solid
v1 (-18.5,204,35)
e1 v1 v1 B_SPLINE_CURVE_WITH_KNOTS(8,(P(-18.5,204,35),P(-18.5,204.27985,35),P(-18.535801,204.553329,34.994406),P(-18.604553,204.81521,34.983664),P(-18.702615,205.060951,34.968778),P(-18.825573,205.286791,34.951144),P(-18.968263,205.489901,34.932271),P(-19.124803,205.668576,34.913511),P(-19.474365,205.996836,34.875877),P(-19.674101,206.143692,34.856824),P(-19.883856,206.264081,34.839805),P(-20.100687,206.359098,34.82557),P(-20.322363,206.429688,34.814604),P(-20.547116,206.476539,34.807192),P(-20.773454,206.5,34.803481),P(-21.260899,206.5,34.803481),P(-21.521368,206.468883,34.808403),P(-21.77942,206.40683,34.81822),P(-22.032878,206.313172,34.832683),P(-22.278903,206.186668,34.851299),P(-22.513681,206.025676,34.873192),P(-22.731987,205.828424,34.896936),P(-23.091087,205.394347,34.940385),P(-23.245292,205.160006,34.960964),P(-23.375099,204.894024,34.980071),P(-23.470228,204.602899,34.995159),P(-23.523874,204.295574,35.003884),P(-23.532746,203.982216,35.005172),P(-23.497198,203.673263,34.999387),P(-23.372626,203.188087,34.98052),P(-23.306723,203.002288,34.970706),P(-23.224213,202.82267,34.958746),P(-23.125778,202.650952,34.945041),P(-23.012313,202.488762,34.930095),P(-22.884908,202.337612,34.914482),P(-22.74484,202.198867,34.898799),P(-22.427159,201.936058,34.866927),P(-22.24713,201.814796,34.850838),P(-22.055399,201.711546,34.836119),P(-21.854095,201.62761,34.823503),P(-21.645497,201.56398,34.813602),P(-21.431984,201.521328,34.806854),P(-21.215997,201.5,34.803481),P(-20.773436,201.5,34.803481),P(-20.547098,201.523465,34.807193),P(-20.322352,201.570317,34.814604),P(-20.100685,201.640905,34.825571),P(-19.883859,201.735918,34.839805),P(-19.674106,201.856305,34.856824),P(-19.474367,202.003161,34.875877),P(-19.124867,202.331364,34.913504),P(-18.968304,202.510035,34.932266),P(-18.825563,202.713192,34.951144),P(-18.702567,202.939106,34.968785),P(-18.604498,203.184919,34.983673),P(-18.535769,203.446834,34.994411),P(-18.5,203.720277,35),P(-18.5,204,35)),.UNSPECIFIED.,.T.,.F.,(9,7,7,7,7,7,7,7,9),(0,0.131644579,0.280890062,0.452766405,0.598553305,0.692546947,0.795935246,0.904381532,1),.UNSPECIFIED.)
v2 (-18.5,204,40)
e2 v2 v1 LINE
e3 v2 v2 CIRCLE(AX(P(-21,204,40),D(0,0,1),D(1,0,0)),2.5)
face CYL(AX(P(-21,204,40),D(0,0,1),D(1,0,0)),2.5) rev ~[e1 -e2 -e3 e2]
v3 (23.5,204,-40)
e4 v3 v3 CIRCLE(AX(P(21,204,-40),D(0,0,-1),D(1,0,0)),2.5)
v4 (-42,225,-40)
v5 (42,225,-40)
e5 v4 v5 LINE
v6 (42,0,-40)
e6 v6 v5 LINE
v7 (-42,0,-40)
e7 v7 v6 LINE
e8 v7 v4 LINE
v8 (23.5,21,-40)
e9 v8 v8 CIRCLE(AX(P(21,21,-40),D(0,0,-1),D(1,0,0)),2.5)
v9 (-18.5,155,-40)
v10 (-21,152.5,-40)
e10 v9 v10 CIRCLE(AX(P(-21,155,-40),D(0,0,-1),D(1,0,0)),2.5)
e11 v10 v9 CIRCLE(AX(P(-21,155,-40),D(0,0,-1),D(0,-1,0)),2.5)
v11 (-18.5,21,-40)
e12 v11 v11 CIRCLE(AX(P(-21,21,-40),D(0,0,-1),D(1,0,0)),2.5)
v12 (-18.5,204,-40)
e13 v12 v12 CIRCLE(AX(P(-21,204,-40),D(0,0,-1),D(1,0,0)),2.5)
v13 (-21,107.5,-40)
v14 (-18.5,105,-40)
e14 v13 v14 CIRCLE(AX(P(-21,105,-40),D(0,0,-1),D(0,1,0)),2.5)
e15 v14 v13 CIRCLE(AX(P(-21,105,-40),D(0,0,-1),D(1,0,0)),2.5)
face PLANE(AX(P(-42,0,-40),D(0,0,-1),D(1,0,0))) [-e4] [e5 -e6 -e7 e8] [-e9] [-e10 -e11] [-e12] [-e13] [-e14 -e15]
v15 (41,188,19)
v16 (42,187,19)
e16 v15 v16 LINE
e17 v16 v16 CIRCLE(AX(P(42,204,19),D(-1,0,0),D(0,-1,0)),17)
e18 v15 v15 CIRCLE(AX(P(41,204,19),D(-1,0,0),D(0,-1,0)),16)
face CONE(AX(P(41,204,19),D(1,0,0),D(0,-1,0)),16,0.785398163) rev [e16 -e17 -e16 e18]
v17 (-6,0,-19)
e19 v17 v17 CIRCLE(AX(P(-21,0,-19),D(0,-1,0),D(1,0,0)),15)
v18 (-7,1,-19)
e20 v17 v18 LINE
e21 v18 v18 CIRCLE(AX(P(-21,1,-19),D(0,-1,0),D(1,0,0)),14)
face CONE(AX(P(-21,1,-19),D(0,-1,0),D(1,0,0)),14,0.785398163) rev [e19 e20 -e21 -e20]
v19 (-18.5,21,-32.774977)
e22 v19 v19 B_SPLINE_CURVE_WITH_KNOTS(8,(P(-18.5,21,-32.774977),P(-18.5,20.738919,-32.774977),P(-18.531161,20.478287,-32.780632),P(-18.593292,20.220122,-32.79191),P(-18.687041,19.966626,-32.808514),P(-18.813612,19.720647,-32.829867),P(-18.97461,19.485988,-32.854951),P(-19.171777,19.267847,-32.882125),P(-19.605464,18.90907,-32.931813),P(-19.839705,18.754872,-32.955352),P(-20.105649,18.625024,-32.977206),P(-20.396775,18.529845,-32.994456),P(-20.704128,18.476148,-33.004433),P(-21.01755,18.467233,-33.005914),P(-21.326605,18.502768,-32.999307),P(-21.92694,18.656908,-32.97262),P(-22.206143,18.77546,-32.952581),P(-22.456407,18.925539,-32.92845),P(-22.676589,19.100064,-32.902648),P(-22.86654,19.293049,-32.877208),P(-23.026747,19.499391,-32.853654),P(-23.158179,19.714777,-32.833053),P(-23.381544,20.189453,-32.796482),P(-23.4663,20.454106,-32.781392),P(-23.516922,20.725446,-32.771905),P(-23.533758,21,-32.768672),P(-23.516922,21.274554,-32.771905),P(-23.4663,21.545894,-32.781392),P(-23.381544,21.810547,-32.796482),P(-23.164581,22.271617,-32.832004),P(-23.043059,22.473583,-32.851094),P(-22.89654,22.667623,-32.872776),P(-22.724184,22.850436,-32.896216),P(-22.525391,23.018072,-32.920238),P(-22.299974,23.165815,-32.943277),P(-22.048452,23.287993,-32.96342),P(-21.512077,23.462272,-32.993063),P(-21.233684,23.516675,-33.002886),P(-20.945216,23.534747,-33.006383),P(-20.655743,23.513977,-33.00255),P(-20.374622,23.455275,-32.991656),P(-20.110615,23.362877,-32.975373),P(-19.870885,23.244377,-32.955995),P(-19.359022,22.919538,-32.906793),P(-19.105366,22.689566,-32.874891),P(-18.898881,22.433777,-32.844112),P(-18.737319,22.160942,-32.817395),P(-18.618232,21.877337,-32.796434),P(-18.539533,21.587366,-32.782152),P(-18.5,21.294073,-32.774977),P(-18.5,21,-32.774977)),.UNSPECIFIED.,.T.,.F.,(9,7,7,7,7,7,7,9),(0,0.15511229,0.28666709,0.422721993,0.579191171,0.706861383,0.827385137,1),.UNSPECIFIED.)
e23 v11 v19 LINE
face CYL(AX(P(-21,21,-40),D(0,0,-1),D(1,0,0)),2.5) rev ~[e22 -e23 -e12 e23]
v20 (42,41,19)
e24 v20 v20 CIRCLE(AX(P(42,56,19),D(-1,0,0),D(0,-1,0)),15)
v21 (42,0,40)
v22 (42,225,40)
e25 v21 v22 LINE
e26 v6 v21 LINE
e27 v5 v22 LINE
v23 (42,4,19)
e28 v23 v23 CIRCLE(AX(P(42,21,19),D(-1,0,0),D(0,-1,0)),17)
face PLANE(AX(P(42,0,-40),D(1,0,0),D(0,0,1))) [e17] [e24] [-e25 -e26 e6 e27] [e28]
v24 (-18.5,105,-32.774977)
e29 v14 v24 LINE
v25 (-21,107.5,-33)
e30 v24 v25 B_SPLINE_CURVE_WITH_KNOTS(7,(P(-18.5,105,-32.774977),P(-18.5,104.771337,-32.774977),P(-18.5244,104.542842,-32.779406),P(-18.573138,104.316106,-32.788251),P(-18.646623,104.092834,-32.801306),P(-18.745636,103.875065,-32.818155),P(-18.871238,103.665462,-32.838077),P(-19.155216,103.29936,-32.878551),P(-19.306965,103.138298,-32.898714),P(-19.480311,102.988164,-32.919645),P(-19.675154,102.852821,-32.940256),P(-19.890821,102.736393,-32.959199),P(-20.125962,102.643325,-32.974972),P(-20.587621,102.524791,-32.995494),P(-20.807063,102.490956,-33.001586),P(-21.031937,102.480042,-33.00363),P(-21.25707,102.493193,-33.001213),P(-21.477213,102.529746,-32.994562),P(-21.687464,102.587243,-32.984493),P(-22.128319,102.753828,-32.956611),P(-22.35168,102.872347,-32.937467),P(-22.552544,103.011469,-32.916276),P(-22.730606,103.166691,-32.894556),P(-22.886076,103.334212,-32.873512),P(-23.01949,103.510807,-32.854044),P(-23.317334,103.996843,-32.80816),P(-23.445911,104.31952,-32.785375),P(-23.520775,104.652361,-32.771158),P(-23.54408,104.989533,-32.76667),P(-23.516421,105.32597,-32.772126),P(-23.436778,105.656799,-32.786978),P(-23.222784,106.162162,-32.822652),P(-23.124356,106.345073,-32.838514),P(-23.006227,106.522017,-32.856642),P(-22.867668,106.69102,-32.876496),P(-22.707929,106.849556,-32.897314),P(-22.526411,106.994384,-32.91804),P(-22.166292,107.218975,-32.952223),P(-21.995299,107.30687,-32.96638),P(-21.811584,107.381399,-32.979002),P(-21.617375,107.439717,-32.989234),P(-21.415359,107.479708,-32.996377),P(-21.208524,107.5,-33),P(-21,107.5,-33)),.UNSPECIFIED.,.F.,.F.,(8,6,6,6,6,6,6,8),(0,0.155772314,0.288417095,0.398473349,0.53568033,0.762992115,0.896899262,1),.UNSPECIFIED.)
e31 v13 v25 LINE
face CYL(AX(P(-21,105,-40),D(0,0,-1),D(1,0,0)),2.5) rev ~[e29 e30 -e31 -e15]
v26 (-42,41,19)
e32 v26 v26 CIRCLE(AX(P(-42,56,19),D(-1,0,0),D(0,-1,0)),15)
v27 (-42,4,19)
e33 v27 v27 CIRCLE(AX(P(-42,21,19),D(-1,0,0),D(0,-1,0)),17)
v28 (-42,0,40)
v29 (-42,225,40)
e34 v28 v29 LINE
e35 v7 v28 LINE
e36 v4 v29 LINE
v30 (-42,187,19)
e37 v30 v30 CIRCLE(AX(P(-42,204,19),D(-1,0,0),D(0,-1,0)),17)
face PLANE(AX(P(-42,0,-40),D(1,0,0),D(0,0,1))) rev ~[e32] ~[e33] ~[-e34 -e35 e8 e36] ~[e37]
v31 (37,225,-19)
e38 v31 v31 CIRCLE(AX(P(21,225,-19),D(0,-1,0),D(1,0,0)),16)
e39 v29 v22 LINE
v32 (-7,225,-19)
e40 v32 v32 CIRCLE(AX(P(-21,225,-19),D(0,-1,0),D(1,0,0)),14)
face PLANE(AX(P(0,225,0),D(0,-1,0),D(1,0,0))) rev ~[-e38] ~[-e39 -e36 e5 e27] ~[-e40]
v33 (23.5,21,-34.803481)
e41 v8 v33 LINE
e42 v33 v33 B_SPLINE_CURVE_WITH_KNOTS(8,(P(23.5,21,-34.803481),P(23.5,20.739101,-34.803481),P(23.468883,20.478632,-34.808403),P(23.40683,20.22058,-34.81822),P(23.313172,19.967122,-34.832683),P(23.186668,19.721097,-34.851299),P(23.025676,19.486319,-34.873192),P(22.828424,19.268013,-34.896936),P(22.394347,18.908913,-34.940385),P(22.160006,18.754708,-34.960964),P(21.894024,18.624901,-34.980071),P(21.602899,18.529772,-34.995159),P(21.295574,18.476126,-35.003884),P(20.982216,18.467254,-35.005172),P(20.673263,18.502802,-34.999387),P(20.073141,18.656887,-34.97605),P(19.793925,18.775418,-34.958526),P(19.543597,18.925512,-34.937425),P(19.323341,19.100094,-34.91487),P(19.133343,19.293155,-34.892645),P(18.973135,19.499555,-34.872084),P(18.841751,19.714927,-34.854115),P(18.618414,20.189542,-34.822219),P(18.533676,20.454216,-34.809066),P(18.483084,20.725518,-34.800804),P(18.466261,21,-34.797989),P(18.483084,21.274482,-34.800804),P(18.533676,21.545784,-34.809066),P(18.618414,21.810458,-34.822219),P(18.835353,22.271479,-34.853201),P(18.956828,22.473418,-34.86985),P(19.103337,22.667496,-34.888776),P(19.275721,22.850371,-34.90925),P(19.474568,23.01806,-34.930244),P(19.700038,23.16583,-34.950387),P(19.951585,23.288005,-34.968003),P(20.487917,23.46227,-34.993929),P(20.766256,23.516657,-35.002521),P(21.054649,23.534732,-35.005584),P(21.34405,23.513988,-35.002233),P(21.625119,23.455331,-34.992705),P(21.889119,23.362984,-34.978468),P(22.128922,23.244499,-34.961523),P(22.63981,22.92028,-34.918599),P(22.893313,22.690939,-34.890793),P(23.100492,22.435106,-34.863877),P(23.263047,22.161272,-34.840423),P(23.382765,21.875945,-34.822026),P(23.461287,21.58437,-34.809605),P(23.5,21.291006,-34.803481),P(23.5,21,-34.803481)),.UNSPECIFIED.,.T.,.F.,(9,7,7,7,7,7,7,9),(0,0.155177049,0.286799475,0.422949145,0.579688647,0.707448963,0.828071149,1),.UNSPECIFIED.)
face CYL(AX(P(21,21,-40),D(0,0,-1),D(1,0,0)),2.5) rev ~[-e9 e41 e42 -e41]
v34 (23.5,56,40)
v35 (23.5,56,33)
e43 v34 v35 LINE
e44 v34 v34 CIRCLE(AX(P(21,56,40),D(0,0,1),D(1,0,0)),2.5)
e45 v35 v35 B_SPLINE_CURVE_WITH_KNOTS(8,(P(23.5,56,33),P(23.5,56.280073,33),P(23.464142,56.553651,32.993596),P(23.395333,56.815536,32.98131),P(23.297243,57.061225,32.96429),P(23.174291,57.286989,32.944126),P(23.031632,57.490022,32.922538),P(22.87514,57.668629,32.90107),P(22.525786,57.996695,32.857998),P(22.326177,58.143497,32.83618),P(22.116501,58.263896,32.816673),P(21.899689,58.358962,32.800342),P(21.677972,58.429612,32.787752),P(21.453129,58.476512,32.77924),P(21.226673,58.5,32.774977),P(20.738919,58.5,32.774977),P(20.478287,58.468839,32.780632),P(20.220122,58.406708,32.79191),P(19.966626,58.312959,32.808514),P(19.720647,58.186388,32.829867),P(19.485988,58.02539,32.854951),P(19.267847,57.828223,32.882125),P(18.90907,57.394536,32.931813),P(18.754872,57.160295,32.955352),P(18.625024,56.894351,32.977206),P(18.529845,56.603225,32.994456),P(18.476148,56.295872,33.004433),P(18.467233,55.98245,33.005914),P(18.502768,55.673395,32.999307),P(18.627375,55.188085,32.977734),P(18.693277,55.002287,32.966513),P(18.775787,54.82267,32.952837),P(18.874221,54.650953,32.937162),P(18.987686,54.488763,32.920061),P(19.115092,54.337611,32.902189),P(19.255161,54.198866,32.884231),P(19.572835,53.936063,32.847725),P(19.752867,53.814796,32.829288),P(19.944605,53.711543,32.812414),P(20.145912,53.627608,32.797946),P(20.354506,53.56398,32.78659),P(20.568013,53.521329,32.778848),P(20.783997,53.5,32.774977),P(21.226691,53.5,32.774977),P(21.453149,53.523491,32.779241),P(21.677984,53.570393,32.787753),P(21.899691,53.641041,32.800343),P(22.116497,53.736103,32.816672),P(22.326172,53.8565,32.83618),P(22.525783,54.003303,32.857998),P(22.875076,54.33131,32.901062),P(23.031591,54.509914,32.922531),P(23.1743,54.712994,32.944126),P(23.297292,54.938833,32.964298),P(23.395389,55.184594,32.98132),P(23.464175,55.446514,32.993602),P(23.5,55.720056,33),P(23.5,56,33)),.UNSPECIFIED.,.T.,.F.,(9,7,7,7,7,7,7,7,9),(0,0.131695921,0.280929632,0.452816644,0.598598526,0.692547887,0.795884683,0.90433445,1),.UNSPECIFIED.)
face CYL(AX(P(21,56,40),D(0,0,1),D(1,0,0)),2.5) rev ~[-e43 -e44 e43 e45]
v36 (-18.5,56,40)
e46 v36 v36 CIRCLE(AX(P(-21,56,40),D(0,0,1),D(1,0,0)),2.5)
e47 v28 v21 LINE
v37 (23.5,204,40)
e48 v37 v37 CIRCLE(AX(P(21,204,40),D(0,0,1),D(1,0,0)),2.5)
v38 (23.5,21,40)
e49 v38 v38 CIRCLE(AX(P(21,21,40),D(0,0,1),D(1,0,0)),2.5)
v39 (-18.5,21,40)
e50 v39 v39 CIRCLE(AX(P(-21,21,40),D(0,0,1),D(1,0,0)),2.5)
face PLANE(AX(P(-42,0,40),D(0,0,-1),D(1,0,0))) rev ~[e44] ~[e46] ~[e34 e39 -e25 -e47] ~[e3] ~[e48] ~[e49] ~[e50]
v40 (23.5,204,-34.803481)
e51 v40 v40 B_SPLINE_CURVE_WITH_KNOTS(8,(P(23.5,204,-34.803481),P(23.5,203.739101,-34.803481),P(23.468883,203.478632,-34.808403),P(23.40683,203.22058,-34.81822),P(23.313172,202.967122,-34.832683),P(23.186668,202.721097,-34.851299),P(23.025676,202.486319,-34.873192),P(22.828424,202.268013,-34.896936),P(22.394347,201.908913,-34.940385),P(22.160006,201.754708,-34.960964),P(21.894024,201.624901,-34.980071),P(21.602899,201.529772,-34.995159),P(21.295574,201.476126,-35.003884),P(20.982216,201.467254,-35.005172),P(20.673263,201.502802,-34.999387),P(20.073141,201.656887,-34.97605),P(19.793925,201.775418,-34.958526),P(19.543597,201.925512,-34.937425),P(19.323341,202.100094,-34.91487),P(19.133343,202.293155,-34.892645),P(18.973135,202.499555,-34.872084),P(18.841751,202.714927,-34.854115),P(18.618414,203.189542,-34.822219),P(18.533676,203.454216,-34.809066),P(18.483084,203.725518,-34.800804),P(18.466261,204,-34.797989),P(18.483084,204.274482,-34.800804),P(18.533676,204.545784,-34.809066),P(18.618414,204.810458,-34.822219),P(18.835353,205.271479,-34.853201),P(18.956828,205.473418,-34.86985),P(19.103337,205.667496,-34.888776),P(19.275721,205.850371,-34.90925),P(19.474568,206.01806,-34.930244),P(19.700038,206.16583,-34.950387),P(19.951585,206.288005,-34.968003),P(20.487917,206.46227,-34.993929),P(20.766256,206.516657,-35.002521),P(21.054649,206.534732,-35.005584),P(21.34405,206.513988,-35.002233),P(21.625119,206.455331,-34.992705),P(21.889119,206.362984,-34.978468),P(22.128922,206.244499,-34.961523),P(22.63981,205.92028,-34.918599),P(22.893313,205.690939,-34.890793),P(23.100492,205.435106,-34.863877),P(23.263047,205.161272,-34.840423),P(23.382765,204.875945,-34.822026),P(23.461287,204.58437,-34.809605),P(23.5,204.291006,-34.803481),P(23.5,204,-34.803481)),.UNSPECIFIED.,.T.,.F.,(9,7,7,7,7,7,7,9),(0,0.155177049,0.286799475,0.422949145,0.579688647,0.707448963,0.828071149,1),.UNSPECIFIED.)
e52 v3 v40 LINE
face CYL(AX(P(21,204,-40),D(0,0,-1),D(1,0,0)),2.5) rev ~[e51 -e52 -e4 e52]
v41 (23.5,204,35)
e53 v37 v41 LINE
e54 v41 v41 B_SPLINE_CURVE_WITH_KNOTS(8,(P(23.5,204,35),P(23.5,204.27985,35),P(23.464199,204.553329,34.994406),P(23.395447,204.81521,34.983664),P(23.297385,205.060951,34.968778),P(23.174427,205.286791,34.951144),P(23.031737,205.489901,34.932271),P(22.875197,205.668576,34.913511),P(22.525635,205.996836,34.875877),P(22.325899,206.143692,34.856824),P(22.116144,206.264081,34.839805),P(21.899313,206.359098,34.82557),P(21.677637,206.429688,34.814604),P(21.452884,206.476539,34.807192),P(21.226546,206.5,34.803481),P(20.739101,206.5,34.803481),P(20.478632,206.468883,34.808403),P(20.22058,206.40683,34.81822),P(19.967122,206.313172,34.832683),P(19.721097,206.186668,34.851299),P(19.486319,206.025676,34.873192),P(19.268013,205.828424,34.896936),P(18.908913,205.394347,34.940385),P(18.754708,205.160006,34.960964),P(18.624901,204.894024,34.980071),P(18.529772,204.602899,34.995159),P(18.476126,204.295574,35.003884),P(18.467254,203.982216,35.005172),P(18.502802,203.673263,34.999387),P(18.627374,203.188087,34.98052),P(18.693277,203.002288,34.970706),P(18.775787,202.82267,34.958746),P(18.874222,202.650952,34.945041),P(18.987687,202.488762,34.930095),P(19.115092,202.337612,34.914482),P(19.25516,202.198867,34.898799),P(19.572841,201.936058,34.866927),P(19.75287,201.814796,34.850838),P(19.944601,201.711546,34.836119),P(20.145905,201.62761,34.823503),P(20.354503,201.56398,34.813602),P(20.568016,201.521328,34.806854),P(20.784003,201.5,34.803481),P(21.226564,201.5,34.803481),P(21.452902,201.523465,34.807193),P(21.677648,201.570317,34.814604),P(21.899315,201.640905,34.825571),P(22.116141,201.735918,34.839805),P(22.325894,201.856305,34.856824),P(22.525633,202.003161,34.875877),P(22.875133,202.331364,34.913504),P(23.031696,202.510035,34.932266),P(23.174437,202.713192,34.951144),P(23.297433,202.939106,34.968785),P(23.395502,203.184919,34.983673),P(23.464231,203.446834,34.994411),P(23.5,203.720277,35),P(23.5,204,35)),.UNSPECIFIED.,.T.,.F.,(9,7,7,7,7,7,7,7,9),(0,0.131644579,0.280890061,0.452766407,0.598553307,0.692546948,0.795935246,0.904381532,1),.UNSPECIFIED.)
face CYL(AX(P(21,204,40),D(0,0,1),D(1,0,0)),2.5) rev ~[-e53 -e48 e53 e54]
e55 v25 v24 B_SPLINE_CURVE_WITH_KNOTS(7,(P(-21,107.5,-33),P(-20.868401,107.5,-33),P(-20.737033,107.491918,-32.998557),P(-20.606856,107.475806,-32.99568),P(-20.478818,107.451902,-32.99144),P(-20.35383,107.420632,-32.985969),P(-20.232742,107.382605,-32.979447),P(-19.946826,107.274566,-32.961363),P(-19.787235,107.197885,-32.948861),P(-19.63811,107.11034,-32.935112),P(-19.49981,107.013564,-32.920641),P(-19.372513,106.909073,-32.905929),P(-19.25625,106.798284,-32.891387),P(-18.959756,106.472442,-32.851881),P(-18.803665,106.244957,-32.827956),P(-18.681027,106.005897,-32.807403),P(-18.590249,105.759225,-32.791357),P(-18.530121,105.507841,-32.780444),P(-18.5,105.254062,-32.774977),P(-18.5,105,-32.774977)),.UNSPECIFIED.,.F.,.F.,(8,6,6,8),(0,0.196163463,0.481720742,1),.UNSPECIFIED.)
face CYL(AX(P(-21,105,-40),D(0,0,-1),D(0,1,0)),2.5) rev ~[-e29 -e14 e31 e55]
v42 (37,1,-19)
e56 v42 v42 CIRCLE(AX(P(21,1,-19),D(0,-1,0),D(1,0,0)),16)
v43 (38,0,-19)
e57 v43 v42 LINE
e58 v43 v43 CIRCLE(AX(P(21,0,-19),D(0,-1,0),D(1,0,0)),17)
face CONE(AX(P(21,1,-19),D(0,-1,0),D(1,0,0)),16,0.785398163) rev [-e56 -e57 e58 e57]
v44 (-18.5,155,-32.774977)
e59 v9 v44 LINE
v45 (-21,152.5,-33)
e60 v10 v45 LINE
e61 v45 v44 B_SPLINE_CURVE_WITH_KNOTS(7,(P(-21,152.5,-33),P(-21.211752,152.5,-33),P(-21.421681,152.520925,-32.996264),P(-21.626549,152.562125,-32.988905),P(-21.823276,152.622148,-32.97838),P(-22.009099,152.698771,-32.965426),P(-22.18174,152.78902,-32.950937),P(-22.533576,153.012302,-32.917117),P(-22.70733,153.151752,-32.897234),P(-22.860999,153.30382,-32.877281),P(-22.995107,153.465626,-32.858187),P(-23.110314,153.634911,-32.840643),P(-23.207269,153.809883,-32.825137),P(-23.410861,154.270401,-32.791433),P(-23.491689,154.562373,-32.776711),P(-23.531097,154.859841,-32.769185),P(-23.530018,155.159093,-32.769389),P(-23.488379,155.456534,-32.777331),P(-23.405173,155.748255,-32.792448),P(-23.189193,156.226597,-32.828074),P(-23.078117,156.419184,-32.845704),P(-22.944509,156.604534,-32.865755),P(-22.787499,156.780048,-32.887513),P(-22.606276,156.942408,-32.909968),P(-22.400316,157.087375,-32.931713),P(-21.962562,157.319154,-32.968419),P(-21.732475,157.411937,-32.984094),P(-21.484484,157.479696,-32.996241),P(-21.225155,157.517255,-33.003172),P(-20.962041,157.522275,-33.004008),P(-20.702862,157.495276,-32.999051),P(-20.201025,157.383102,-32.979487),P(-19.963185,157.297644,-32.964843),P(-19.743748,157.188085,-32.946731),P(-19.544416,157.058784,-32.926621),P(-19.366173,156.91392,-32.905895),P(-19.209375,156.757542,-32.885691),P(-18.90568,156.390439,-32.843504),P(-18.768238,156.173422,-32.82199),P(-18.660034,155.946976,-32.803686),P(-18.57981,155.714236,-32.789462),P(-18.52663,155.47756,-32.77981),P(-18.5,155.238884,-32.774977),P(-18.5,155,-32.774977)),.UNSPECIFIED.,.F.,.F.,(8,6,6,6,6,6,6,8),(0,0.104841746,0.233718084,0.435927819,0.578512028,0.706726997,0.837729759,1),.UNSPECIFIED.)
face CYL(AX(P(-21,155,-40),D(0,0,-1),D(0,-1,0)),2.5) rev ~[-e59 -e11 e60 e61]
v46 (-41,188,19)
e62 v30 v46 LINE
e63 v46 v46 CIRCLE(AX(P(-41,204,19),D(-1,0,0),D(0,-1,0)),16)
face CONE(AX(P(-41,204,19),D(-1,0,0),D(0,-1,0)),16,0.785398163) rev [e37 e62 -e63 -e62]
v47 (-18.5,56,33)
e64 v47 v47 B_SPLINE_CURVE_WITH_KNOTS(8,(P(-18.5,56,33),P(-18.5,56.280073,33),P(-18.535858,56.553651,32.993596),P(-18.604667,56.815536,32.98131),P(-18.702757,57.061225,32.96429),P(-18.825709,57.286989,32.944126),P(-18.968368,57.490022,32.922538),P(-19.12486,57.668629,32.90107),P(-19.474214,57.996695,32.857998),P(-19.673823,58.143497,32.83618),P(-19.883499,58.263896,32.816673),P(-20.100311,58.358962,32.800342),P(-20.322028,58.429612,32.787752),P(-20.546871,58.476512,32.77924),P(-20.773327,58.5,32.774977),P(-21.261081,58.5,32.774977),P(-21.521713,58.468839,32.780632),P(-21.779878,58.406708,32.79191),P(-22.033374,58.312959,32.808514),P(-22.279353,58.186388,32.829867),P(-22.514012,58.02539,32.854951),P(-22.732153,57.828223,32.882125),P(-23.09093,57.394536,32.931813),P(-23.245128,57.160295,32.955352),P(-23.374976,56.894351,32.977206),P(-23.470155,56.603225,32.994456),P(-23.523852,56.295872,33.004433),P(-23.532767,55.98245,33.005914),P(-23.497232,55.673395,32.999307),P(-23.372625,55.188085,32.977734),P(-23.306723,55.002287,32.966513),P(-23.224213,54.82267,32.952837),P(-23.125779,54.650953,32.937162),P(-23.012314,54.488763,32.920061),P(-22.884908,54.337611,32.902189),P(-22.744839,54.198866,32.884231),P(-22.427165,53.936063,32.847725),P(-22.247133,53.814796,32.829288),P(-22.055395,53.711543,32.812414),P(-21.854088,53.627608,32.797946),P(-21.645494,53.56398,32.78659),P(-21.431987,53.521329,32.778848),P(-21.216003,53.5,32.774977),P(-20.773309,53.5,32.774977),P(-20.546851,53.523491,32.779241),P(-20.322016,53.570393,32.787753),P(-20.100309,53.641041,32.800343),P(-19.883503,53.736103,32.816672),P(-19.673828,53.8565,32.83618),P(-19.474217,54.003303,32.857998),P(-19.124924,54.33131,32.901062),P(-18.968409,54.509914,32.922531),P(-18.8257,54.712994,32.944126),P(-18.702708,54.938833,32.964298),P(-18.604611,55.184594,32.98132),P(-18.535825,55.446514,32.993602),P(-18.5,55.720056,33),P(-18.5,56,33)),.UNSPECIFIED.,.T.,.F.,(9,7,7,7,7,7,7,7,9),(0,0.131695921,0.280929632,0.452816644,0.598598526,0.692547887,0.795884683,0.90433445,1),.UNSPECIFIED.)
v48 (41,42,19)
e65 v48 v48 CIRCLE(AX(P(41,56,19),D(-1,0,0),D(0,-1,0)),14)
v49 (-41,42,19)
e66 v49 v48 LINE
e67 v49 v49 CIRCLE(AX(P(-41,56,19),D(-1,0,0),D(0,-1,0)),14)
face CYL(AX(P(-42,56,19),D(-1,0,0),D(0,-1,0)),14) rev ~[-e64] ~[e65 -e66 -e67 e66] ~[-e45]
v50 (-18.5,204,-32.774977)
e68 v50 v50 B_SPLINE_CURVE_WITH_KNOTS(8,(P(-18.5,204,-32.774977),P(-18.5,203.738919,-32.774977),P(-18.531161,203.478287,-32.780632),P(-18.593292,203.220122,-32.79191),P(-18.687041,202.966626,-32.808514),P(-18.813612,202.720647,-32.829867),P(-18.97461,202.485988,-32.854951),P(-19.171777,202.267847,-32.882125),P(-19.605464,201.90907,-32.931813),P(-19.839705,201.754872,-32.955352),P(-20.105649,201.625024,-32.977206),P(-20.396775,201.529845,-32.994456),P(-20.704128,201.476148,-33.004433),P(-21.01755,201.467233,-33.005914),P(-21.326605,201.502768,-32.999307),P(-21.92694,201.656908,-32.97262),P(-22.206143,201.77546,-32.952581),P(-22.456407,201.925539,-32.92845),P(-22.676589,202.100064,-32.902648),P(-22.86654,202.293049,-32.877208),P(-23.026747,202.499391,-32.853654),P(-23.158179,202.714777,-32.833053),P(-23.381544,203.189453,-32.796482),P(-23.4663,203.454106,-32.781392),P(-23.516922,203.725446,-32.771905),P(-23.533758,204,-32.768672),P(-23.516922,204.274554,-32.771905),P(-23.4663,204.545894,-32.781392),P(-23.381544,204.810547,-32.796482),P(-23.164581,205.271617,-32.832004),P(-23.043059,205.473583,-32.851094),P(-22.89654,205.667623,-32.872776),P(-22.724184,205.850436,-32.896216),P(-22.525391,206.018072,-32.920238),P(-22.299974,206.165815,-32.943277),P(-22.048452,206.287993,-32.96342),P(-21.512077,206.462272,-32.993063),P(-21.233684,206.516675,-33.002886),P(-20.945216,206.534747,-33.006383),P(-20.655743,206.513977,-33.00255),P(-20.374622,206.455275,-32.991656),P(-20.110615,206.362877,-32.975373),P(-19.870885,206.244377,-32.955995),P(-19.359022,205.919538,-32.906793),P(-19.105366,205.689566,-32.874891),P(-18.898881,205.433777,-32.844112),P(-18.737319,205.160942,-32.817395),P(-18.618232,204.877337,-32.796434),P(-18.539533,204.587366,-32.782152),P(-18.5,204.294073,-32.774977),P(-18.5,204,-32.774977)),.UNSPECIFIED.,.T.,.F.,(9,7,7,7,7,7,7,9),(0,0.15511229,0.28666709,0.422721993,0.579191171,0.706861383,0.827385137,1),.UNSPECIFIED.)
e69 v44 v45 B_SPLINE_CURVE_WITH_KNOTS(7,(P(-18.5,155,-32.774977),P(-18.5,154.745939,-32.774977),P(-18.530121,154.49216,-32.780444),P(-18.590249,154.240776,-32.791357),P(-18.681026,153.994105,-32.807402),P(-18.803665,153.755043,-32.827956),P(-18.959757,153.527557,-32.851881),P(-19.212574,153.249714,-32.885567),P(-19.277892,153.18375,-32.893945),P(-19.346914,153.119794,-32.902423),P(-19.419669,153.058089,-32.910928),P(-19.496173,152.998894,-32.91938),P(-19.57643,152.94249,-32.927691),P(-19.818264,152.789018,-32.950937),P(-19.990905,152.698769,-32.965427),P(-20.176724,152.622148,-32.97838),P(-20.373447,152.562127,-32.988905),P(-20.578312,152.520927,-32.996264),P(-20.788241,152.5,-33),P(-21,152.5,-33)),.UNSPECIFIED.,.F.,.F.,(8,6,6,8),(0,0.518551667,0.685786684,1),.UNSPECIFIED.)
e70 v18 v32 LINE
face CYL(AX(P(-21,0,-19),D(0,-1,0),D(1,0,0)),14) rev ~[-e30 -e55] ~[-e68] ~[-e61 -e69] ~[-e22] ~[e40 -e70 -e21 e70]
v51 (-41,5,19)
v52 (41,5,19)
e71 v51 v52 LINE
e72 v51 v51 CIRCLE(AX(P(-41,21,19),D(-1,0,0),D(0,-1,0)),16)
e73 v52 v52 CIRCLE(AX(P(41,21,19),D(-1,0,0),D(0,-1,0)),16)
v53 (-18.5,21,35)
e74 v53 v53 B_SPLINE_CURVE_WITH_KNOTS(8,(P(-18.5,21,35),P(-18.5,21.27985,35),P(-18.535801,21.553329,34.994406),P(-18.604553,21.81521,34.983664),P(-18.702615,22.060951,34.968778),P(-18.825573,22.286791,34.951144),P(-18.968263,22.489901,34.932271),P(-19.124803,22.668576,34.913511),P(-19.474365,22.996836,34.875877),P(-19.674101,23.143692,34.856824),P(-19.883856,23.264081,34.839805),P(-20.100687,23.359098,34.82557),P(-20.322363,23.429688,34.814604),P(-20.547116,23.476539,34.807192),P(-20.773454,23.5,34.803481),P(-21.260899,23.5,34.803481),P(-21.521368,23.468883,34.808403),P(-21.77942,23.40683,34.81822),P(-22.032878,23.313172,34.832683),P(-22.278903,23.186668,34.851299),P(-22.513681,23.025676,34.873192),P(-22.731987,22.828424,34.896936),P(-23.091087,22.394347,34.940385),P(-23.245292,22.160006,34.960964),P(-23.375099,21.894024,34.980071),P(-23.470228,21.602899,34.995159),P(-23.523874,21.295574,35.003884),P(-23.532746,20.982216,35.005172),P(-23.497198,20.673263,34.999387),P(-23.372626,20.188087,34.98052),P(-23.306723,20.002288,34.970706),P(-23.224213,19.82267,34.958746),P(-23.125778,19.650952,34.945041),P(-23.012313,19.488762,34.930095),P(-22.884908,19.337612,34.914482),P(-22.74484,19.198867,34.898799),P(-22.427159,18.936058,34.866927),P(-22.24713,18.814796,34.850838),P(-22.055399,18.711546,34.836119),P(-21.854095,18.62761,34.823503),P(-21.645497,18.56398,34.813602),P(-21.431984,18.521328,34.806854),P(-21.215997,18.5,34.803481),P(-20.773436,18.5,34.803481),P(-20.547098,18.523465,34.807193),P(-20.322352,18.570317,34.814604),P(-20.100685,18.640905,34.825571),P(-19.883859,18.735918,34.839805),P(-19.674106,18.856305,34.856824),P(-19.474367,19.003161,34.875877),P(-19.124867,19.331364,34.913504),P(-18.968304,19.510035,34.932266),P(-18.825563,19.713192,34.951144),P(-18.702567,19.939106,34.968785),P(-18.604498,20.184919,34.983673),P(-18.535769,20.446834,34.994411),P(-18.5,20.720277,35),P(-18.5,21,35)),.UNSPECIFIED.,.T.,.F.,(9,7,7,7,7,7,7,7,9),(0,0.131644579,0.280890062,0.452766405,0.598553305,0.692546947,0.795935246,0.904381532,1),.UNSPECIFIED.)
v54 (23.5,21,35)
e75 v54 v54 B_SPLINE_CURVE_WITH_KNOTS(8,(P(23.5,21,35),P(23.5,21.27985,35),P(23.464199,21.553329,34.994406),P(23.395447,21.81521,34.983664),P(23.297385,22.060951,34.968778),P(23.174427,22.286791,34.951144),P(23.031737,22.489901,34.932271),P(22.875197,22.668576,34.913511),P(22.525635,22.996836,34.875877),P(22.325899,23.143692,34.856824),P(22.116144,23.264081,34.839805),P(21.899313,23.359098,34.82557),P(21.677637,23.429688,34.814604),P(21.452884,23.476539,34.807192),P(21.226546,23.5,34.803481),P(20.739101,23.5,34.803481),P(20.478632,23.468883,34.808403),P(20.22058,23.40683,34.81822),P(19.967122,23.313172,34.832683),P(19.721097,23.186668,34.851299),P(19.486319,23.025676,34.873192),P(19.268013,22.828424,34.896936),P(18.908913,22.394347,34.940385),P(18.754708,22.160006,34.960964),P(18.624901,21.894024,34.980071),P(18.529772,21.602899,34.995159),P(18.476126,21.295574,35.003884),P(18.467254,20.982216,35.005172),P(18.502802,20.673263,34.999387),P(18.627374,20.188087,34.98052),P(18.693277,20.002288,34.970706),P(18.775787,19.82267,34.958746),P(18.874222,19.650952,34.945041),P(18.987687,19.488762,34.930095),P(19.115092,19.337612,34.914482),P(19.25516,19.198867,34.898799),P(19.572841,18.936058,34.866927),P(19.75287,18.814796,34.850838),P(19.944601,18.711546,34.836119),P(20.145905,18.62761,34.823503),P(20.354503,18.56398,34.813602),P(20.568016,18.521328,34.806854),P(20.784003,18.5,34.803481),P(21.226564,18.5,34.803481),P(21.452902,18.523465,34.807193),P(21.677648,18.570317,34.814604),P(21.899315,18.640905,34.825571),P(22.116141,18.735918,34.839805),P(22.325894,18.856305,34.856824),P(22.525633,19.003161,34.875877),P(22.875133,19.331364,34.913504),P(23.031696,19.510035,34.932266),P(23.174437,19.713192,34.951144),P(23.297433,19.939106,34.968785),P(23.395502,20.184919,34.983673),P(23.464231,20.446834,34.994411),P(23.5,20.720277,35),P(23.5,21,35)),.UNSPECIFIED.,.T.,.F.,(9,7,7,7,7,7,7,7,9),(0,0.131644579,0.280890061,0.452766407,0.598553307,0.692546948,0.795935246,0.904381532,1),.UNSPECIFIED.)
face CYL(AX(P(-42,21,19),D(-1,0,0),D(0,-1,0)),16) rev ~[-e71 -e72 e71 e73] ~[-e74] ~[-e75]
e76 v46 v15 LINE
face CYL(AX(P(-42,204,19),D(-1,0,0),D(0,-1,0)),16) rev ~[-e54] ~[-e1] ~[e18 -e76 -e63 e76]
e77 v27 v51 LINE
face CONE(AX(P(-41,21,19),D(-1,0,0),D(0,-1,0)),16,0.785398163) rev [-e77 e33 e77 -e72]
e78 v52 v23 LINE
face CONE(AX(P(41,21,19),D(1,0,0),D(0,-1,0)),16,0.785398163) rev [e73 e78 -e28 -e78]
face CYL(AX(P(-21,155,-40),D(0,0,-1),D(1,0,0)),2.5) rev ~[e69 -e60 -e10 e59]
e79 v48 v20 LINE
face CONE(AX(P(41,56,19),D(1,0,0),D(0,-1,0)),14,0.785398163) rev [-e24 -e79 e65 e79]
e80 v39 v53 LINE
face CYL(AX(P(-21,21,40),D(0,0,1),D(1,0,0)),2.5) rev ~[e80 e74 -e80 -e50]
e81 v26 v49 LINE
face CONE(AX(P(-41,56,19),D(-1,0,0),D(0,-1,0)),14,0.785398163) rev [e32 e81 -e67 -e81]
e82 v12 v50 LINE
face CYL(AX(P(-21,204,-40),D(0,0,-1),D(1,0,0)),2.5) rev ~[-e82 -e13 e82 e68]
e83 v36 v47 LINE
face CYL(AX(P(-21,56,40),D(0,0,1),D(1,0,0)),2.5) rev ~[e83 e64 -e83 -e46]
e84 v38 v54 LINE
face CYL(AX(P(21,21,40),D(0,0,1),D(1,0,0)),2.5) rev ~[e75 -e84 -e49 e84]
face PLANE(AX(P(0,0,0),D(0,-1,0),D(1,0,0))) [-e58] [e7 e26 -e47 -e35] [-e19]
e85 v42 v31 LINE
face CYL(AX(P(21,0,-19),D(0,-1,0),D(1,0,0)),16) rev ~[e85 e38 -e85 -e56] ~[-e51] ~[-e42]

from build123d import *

# Parameters (mm, degrees)
F0_W     = 84
F0_H     = 80
F0_R     = 14
F0_R_2   = 16
F1_DEPTH = 225
F2_R     = 16
F2_R_2   = 14
F3_DEPTH = 100
F4_SIZE  = 1
F5_R     = 2.5
F6_DEPTH = 25
F7_R     = 2.5
F8_DEPTH = 25


# Not quite as in the source:
# - a feature names something its author has since deleted; it is built from what else it names


with BuildPart() as f1:
    # F0 (on Front) → F1 (new body)
    with BuildSketch(Plane.XZ):
        Rectangle(F0_W, F0_H)
        with Locations((-21, -19)):
            Circle(F0_R, mode=Mode.SUBTRACT)
        with Locations((21, -19)):
            Circle(F0_R_2, mode=Mode.SUBTRACT)
    extrude(amount=-F1_DEPTH)

    # F2 (on face) → F3 (cut)
    with BuildSketch(Plane(origin=(-42, 0, 0), x_dir=(0, -1, 0), z_dir=(-1, 0, 0))):
        with Locations((-204, 19)):
            Circle(F2_R)
        with Locations((-56, 19)):
            Circle(F2_R_2)
        with Locations((-21, 19)):
            Circle(F2_R)
    extrude(amount=-F3_DEPTH, mode=Mode.SUBTRACT)

    # F4
    f4_edges = [f1.edges().sort_by_distance(p)[0] for p in [
        (-42, 220, 19),
        (-42, 70, 19),
        (-42, 37, 19),
        (-35, 0, -19),
        (5, 0, -19),
        (42, 37, 19),
        (42, 70, 19),
        (42, 220, 19),
    ]]
    chamfer(f4_edges, length=F4_SIZE)

    # F5 (on face) → F6 (cut)
    with BuildSketch(Plane.XY.offset(40)):
        with Locations((21, 204)):
            Circle(F5_R)
        with Locations((21, 56)):
            Circle(F5_R)
        with Locations((21, 21)):
            Circle(F5_R)
        with Locations((-21, 21)):
            Circle(F5_R)
        with Locations((-21, 56)):
            Circle(F5_R)
        with Locations((-21, 204)):
            Circle(F5_R)
    extrude(amount=-F6_DEPTH, mode=Mode.SUBTRACT)

    # F7 (on face) → F8 (cut)
    with BuildSketch(Plane(origin=(0, 0, -40), x_dir=(1, 0, 0), z_dir=(0, 0, -1))):
        with Locations((-21, -21)):
            Circle(F7_R)
        with Locations((21, -21)):
            Circle(F7_R)
        with BuildLine():
            ThreePointArc((-18.5, -105), (-22.767766953, -103.232233047), (-21, -107.5))
            ThreePointArc((-21, -107.5), (-19.232233047, -106.767766953), (-18.5, -105))
        make_face()
        with BuildLine():
            ThreePointArc((-21, -152.5), (-22.767766953, -156.767766953), (-18.5, -155))
            ThreePointArc((-18.5, -155), (-19.232233047, -153.232233047), (-21, -152.5))
        make_face()
        with Locations((-21, -204)):
            Circle(F7_R)
        with Locations((21, -204)):
            Circle(F7_R)
    extrude(amount=-F8_DEPTH, mode=Mode.SUBTRACT)


solid = f1.part
